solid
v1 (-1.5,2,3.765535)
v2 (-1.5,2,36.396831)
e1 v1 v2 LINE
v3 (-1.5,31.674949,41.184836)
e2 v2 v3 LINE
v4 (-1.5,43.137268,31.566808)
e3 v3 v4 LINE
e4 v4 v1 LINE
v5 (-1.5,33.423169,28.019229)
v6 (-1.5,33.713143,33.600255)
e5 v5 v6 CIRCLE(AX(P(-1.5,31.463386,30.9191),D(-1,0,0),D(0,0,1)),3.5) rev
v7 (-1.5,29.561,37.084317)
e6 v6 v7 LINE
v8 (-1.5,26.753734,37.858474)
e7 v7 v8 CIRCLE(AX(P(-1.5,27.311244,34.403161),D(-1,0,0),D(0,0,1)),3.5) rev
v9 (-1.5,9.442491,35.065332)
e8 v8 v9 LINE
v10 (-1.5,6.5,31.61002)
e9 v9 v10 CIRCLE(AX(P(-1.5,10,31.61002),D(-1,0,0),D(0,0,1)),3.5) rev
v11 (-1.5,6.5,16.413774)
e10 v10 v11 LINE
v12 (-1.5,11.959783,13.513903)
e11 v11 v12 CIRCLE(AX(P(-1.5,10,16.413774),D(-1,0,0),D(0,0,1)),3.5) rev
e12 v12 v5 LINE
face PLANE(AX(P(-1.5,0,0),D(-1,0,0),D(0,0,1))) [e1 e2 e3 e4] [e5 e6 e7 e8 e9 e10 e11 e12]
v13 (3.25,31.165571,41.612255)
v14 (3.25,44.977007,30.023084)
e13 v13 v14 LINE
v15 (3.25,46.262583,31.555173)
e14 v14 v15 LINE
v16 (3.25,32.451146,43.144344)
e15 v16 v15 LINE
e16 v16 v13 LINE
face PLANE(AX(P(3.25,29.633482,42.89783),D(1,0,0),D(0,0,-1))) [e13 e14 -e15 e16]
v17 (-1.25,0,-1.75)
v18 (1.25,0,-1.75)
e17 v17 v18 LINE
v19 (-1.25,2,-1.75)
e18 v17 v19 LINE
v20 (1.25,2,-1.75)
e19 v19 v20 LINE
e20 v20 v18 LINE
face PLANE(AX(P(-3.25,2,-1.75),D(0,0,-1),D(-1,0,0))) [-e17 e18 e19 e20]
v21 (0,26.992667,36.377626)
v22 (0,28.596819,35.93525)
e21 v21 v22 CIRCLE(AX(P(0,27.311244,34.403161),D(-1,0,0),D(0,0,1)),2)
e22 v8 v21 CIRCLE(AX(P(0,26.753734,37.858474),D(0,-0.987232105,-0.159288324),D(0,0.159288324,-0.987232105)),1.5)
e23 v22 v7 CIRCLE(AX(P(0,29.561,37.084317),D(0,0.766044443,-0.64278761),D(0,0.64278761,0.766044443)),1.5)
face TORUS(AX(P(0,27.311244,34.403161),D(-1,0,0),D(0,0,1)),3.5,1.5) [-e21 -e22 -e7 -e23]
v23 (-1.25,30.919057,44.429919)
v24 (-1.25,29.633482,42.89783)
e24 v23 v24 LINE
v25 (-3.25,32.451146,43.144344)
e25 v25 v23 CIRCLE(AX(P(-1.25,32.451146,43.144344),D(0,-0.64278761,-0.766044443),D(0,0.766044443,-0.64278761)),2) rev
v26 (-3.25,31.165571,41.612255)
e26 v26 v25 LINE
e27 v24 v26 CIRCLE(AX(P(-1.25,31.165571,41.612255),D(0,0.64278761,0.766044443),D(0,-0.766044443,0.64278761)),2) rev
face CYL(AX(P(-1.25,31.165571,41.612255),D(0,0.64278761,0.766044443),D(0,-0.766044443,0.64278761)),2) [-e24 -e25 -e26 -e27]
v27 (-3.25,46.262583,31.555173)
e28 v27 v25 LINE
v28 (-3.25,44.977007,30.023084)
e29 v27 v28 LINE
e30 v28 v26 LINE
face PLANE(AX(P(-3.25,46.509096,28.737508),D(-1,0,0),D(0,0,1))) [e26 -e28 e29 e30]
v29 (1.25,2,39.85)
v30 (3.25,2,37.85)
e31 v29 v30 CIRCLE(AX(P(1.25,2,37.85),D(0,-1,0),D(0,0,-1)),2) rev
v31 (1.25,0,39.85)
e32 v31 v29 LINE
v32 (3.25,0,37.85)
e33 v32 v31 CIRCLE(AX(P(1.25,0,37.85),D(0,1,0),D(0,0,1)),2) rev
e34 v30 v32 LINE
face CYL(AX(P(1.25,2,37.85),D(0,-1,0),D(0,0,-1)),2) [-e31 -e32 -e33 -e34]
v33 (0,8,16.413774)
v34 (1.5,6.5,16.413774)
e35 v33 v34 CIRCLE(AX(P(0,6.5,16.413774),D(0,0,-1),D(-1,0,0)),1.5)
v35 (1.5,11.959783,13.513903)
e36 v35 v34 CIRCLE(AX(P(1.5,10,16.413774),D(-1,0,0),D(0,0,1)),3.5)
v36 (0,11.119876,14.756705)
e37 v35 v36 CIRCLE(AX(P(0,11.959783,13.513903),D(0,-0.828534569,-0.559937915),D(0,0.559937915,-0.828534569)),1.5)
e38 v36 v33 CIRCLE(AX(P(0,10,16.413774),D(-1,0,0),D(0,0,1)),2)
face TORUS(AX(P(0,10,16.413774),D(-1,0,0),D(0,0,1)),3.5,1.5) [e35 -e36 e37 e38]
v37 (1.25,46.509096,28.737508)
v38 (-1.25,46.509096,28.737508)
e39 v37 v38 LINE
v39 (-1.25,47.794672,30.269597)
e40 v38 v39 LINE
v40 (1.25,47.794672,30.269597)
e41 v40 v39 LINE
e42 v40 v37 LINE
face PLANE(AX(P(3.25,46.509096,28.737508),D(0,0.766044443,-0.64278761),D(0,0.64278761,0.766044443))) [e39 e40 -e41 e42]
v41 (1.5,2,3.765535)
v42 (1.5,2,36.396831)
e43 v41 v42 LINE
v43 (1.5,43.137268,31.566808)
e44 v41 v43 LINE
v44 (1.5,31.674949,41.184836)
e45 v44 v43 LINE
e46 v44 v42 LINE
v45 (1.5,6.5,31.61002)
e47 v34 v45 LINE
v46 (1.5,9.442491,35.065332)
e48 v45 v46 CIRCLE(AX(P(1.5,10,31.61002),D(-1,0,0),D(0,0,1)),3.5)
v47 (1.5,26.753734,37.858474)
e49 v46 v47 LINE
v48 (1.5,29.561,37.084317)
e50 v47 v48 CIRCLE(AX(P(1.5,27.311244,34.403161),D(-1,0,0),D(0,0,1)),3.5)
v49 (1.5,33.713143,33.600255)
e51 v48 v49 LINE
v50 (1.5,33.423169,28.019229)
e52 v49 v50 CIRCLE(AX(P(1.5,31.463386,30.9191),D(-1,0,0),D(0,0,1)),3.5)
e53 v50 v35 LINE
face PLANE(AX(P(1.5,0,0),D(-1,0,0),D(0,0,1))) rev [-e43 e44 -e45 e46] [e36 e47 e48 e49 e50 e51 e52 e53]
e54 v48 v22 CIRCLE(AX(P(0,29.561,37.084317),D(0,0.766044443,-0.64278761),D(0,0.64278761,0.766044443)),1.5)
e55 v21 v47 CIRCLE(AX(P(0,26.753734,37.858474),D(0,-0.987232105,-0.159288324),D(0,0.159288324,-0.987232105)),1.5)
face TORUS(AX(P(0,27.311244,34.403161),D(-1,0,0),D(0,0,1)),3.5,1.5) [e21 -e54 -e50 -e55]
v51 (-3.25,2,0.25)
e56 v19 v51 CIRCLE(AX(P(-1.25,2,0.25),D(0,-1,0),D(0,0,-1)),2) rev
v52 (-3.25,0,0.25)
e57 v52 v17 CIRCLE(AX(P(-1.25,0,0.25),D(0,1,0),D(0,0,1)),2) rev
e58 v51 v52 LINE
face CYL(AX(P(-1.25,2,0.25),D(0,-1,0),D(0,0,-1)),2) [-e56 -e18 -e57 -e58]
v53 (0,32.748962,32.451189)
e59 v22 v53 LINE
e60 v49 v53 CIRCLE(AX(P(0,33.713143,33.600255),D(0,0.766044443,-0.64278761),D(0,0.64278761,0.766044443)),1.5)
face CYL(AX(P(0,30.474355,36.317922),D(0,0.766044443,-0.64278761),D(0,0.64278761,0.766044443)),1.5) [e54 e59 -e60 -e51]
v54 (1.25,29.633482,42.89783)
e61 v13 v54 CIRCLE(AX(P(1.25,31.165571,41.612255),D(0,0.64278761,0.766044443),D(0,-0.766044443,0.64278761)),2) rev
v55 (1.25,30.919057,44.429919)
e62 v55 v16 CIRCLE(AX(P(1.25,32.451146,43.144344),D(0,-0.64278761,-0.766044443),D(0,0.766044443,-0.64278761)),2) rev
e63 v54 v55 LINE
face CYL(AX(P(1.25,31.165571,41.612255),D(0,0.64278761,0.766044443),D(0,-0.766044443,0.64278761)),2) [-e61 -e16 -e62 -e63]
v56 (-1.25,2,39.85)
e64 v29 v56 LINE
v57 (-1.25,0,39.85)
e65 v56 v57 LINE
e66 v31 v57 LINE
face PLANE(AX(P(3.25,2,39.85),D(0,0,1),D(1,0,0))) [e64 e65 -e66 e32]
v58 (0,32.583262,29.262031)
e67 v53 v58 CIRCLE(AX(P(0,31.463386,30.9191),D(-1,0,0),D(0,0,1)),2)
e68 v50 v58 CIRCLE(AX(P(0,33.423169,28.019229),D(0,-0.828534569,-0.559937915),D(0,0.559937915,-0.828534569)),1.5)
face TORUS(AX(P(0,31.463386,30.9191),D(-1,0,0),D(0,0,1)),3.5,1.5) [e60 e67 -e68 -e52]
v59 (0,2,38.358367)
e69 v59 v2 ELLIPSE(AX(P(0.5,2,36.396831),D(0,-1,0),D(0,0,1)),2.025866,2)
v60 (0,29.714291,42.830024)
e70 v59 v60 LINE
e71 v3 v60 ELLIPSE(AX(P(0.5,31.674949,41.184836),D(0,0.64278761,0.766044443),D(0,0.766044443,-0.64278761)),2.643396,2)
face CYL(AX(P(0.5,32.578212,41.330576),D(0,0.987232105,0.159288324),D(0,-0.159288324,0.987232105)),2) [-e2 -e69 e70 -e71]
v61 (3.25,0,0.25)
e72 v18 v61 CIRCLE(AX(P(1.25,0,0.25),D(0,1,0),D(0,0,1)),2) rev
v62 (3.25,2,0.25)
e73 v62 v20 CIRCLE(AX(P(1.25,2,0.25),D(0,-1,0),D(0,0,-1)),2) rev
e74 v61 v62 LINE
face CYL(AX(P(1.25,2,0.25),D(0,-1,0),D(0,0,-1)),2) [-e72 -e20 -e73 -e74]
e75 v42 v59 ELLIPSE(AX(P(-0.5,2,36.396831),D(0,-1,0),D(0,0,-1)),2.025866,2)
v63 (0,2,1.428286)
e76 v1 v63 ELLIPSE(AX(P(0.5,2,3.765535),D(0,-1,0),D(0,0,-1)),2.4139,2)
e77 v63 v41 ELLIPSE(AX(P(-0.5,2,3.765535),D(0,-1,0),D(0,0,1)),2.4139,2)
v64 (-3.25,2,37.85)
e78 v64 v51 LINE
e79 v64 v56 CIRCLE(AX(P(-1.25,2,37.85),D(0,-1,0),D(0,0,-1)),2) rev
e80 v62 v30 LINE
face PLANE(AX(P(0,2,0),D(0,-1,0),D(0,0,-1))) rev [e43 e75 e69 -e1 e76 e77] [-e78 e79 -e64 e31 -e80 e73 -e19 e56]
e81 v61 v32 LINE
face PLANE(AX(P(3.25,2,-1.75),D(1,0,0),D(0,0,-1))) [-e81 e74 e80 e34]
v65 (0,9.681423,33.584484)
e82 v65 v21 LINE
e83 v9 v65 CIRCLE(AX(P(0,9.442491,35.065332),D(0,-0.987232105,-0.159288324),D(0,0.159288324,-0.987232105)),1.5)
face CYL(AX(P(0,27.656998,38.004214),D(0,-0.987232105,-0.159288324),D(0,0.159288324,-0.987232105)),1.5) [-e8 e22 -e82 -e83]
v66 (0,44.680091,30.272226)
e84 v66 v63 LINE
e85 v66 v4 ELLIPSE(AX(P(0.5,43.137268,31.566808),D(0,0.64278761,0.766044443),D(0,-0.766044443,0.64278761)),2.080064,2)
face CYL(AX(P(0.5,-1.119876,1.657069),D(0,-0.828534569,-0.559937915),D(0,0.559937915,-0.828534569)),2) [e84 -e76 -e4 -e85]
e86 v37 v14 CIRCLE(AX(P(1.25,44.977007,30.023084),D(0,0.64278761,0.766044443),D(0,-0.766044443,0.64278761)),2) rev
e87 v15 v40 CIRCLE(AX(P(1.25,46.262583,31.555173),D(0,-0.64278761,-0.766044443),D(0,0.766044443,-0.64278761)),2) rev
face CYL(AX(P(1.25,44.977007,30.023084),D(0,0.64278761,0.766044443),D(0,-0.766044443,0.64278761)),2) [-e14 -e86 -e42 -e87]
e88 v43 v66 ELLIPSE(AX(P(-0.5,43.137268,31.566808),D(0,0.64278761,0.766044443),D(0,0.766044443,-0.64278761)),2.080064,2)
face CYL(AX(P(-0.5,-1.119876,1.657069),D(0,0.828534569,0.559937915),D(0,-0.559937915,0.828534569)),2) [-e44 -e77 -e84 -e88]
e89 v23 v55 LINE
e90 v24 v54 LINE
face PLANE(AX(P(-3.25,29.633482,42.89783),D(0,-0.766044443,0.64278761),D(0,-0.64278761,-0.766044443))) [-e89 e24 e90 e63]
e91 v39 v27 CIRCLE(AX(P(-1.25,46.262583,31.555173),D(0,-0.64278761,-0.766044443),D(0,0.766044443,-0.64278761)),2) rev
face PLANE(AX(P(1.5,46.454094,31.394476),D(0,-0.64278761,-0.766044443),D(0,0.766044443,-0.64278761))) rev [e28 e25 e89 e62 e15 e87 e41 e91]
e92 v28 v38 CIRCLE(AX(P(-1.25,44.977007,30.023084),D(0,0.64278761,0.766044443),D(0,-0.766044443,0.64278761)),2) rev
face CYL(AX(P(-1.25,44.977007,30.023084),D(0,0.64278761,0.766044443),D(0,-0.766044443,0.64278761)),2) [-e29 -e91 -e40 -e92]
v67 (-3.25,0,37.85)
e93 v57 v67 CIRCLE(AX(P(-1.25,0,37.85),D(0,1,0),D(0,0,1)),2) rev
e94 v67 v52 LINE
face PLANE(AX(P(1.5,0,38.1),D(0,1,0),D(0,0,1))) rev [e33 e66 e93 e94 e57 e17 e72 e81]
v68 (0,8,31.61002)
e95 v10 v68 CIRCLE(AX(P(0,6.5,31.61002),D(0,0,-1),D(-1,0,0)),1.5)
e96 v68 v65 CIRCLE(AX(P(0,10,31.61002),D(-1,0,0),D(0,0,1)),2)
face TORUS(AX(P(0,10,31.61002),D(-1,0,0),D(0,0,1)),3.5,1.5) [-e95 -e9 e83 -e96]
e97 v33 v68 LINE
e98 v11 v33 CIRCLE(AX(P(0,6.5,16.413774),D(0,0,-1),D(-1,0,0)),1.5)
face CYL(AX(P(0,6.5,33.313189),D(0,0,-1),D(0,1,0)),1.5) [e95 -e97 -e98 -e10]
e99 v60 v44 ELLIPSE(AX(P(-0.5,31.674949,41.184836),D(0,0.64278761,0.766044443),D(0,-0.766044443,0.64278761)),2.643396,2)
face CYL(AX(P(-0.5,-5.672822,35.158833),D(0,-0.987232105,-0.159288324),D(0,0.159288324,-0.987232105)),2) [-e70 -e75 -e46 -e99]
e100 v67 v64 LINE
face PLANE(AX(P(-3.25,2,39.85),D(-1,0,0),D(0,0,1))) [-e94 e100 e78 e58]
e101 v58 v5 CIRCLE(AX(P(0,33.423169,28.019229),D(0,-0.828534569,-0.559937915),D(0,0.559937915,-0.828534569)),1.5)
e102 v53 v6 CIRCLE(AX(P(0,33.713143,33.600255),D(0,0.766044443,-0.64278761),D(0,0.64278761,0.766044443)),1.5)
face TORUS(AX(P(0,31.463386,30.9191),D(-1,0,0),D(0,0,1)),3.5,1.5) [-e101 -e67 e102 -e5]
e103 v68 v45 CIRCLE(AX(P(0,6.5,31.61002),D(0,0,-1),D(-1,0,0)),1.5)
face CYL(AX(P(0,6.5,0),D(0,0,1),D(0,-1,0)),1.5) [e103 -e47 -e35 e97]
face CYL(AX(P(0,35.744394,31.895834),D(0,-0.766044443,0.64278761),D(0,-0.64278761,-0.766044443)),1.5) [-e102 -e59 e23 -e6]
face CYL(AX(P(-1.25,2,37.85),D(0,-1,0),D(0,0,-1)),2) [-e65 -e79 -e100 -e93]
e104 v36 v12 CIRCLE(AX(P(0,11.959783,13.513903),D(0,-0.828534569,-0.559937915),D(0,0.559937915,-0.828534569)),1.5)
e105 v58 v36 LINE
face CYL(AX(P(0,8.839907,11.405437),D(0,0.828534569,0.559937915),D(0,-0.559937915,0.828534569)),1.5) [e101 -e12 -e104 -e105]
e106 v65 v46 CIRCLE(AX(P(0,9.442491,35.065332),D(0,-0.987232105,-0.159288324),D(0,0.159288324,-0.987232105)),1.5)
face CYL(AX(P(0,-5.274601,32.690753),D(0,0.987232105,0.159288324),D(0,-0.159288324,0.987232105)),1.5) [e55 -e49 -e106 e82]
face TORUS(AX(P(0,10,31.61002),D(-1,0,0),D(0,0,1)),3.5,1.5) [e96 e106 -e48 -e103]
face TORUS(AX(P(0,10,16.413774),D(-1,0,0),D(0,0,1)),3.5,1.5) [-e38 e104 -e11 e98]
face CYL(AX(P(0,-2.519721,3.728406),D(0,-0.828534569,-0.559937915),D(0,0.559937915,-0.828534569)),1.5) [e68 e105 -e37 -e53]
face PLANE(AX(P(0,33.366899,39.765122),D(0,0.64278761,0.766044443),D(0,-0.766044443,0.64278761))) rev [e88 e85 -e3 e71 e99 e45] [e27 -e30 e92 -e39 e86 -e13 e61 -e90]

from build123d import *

# Parameters (mm, degrees)
BOSS_EXTRUDE1_DEPTH     = 1.5
SKETCH2_W               = 6.5
SKETCH2_H               = 41.6
BOSS_EXTRUDE2_DEPTH     = 2
SKETCH3_W               = 6.5
SKETCH3_H               = 22.029549655
BOSS_EXTRUDE3_DEPTH     = 2
CUT_EXTRUDE1_DEPTH      = 66.428669726
CUT_EXTRUDE1_DEPTH_BACK = 66.428669726
FILLET1_R               = 2
FILLET2_R               = 1.5


# Some blends are built 0.0001 mm under size
with BuildPart() as part:
    # Sketch1 → Boss-Extrude1 (new, symmetric)
    with BuildSketch(Plane(origin=(0, 0, 0), x_dir=(0, 0, -1), z_dir=(1, 0, 0))):
        Polygon((-43.305040632, 32.259635184), (-38.1, 0), (0, 0), (-31.3944757, 46.45409373), align=None)
    extrude(amount=BOSS_EXTRUDE1_DEPTH, both=True)

    # Sketch2 → Boss-Extrude2 (add)
    with BuildSketch(Plane.XZ):
        with Locations((0, 19.05)):
            Rectangle(SKETCH2_W, SKETCH2_H)
    extrude(amount=-BOSS_EXTRUDE2_DEPTH)

    # Sketch3 → Boss-Extrude3 (add)
    with BuildSketch(Plane(origin=(0, 34.65247404, 41.29721043), x_dir=(1, 0, 0), z_dir=(0, 0.6427876096865434, 0.7660444431189747))):
        with Locations((0, 6.141145543)):
            Rectangle(SKETCH3_W, SKETCH3_H)
    extrude(amount=-BOSS_EXTRUDE3_DEPTH)

    # Sketch4 → Cut-Extrude1 (cut, two sides: drawn at the far end of the back side and taken through both)
    with BuildSketch(Plane(origin=(1.5, 0, 0), x_dir=(0, 0, -1), z_dir=(1, 0, 0)).offset(-CUT_EXTRUDE1_DEPTH_BACK)):
        Polygon((-36.523365649, 27.895930093), (-33.313189095, 8), (-12.648239091, 8), (-30.746767143, 34.780212116), align=None)
    extrude(amount=CUT_EXTRUDE1_DEPTH + CUT_EXTRUDE1_DEPTH_BACK, mode=Mode.SUBTRACT)

    # Fillet1
    # the kernel refuses this fillet: 2 mm, written as the material it adds along each edge
    with BuildSketch(Plane(origin=(1.5, 34.780212116, 30.746767143), x_dir=(0, -0.8285345686504685, -0.5599379149076996), z_dir=(-1, 0, 0))) as fillet1_piece_1:
        with BuildLine():
            CenterArc((FILLET1_R * 1.32580458231, FILLET1_R), FILLET1_R, 164.051504254, 105.948495746)
            Line((FILLET1_R * 0.364295499179, FILLET1_R * 1.27477314835), (0, 0))
            Line((0, 0), (FILLET1_R * 1.32580458231, 0))
        make_face()
    extrude(amount=3)
    with BuildSketch(Plane(origin=(-1.5, 8, 12.648239091), x_dir=(0, 0, 1), z_dir=(1, 0, 0))) as fillet1_piece_2:
        with BuildLine():
            CenterArc((FILLET1_R * 1.88276744741, -FILLET1_R), FILLET1_R, 90, 124.051504254)
            Line((FILLET1_R * 1.05423287876, -FILLET1_R * 1.55993791491), (0, 0))
            Line((0, 0), (FILLET1_R * 1.88276744741, 0))
        make_face()
    extrude(amount=3)
    with BuildSketch(Plane(origin=(1.5, 27.895930093, 36.523365649), x_dir=(0, 0.7660444431189765, -0.6427876096865413), z_dir=(-1, 0, 0))) as fillet1_piece_3:
        with BuildLine():
            CenterArc((FILLET1_R * 0.457472572927, FILLET1_R), FILLET1_R, 220.834409573, 49.165590427)
            Line((-FILLET1_R * 0.299129927729, FILLET1_R * 0.346124892658), (0, 0))
            Line((0, 0), (FILLET1_R * 0.457472572927, 0))
        make_face()
    extrude(amount=3)
    with BuildSketch(Plane(origin=(-1.5, 8, 33.313189095), x_dir=(0, 0, -1), z_dir=(1, 0, 0))) as fillet1_piece_4:
        with BuildLine():
            CenterArc((FILLET1_R * 0.851584618699, FILLET1_R), FILLET1_R, 189.165590427, 80.834409573)
            Line((-FILLET1_R * 0.135647486653, FILLET1_R * 0.840711676004), (0, 0))
            Line((0, 0), (FILLET1_R * 0.851584618699, 0))
        make_face()
    extrude(amount=3)
    # the kernel refuses this fillet: 2 mm, written as the material it takes off along each edge
    with BuildSketch(Plane(origin=(-1.5, 34.586150343, 43.680420138), x_dir=(0, 0.1592883239956265, -0.9872321053524669), z_dir=(0, -0.987232105352467, -0.15928832399562654))) as fillet1_2_piece_1_section:
        with BuildLine():
            CenterArc((FILLET1_R, FILLET1_R), FILLET1_R, 180, 90)
            Line((0, FILLET1_R), (0, 0))
            Line((0, 0), (FILLET1_R, 0))
        make_face()
    fillet1_2_piece_1 = extrude(amount=38.007587746, mode=Mode.PRIVATE)
    fillet1_2_piece_1 = split(fillet1_2_piece_1, bisect_by=Plane(origin=(-1.056244864, 22.976919754, 48.483349146), z_dir=(0, -0.6427876096865434, -0.7660444431189747)), keep=Keep.TOP, mode=Mode.PRIVATE)
    fillet1_2_piece_1 = split(fillet1_2_piece_1, bisect_by=Plane(origin=(-1.056244864, 2, 40.232595457), z_dir=(0, 1, 0)), keep=Keep.TOP, mode=Mode.PRIVATE)
    add(fillet1_2_piece_1, mode=Mode.SUBTRACT)
    with BuildSketch(Plane(origin=(-1.5, -2.142672843, -1.448055168), x_dir=(1, 0, 0), z_dir=(0, 0.8285345686504687, 0.5599379149076993))) as fillet1_2_piece_2_section:
        with BuildLine():
            CenterArc((FILLET1_R, -FILLET1_R), FILLET1_R, 90, 90)
            Line((0, -FILLET1_R), (0, 0))
            Line((0, 0), (FILLET1_R, 0))
        make_face()
    fillet1_2_piece_2 = extrude(amount=61.573815732, mode=Mode.PRIVATE)
    fillet1_2_piece_2 = split(fillet1_2_piece_2, bisect_by=Plane(origin=(-1.05170861, 38.993973381, 35.043445356), z_dir=(0, -0.6427876096865434, -0.7660444431189747)), keep=Keep.TOP, mode=Mode.PRIVATE)
    fillet1_2_piece_2 = split(fillet1_2_piece_2, bisect_by=Plane(origin=(-1.05170861, 2, 16.20714214), z_dir=(0, 1, 0)), keep=Keep.TOP, mode=Mode.PRIVATE)
    add(fillet1_2_piece_2, mode=Mode.SUBTRACT)
    with BuildSketch(Plane(origin=(1.5, -2.142672843, -1.448055168), x_dir=(0, -0.5599379149076993, 0.8285345686504687), z_dir=(0, 0.8285345686504687, 0.5599379149076993))) as fillet1_2_piece_3_section:
        with BuildLine():
            CenterArc((FILLET1_R, -FILLET1_R), FILLET1_R, 90, 90)
            Line((0, -FILLET1_R), (0, 0))
            Line((0, 0), (FILLET1_R, 0))
        make_face()
    fillet1_2_piece_3 = extrude(amount=61.573815732, mode=Mode.PRIVATE)
    fillet1_2_piece_3 = split(fillet1_2_piece_3, bisect_by=Plane(origin=(1.05170861, 38.993973381, 35.043445356), z_dir=(0, -0.6427876096865434, -0.7660444431189747)), keep=Keep.TOP, mode=Mode.PRIVATE)
    fillet1_2_piece_3 = split(fillet1_2_piece_3, bisect_by=Plane(origin=(1.05170861, 2, 16.20714214), z_dir=(0, 1, 0)), keep=Keep.TOP, mode=Mode.PRIVATE)
    add(fillet1_2_piece_3, mode=Mode.SUBTRACT)
    with BuildSketch(Plane(origin=(1.5, 34.586150343, 43.680420138), x_dir=(0, 0.1592883239956265, -0.9872321053524669), z_dir=(0, -0.987232105352467, -0.15928832399562654))) as fillet1_2_piece_4_section:
        with BuildLine():
            CenterArc((FILLET1_R, -FILLET1_R), FILLET1_R, 90, 90)
            Line((0, -FILLET1_R), (0, 0))
            Line((0, 0), (FILLET1_R, 0))
        make_face()
    fillet1_2_piece_4 = extrude(amount=38.007587746, mode=Mode.PRIVATE)
    fillet1_2_piece_4 = split(fillet1_2_piece_4, bisect_by=Plane(origin=(1.056244864, 22.976919754, 48.483349146), z_dir=(0, -0.6427876096865434, -0.7660444431189747)), keep=Keep.TOP, mode=Mode.PRIVATE)
    fillet1_2_piece_4 = split(fillet1_2_piece_4, bisect_by=Plane(origin=(1.056244864, 2, 40.232595457), z_dir=(0, 1, 0)), keep=Keep.TOP, mode=Mode.PRIVATE)
    add(fillet1_2_piece_4, mode=Mode.SUBTRACT)
    with BuildSketch(Plane(origin=(-3.25, 51.008609554, 34.099819599), x_dir=(0, -0.7660444431189747, 0.6427876096865432), z_dir=(0, -0.6427876096865434, -0.7660444431189747)), Plane(origin=(-3.25, -5, 39.85), x_dir=(0, 0, -1), z_dir=(0, 1, 0)), Plane(origin=(3.25, -5, 39.85), x_dir=(-1, 0, 0), z_dir=(0, 1, 0))) as fillet1_2_piece_5:
        with BuildLine():
            CenterArc((FILLET1_R, -FILLET1_R), FILLET1_R, 90, 90)
            Line((0, -FILLET1_R), (0, 0))
            Line((0, 0), (FILLET1_R, 0))
        make_face()
    extrude(amount=12, mode=Mode.SUBTRACT)
    with BuildSketch(Plane(origin=(-3.25, 34.132995457, 48.260141164), x_dir=(0, 0.7660444431189747, -0.6427876096865434), z_dir=(0, -0.6427876096865434, -0.7660444431189747)), Plane(origin=(3.25, 34.132995457, 48.260141164), x_dir=(-1, 0, 0), z_dir=(0, -0.6427876096865434, -0.7660444431189747))) as fillet1_2_piece_6:
        with BuildLine():
            CenterArc((FILLET1_R, FILLET1_R), FILLET1_R, 180, 90)
            Line((0, FILLET1_R), (0, 0))
            Line((0, 0), (FILLET1_R, 0))
        make_face()
    extrude(amount=7, mode=Mode.SUBTRACT)
    with BuildSketch(Plane(origin=(3.25, 51.008609554, 34.099819599), x_dir=(0, -0.7660444431189747, 0.6427876096865432), z_dir=(0, -0.6427876096865434, -0.7660444431189747)), Plane(origin=(-3.25, -5, -1.75), x_dir=(0, 0, 1), z_dir=(0, 1, 0)), Plane(origin=(3.25, -5, -1.75), x_dir=(-1, 0, 0), z_dir=(0, 1, 0))) as fillet1_2_piece_7:
        with BuildLine():
            CenterArc((FILLET1_R, FILLET1_R), FILLET1_R, 180, 90)
            Line((0, FILLET1_R), (0, 0))
            Line((0, 0), (FILLET1_R, 0))
        make_face()
    extrude(amount=12, mode=Mode.SUBTRACT)

    # Fillet2
    fillet2_edges = [part.edges().sort_by_distance(p)[0] for p in [
        (1.5, 9.061850667, 14.647456961),
        (1.5, 21.851569045, 22.009367742),
        (1.5, 33.460692344, 30.815325558),
        (1.5, 30.672890194, 34.193219453),
        (1.5, 27.842934726, 36.331192599),
        (1.5, 18.337045111, 34.981054819),
        (1.5, 8.477312689, 32.906716951),
        (-1.5, 9.061850667, 14.647456961),
        (-1.5, 21.851569045, 22.009367742),
        (-1.5, 33.460692344, 30.815325558),
        (-1.5, 30.672890194, 34.193219453),
        (-1.5, 27.842934726, 36.331192599),
        (-1.5, 18.337045111, 34.981054819),
        (-1.5, 8.477312689, 32.906716951),
        (1.5, 8, 24.011896921),
        (-1.5, 8, 24.011896921),
    ]]
    fillet(fillet2_edges, radius=FILLET2_R - 0.0001)  # a hair under: the kernel refuses the full size


solid = part.part
